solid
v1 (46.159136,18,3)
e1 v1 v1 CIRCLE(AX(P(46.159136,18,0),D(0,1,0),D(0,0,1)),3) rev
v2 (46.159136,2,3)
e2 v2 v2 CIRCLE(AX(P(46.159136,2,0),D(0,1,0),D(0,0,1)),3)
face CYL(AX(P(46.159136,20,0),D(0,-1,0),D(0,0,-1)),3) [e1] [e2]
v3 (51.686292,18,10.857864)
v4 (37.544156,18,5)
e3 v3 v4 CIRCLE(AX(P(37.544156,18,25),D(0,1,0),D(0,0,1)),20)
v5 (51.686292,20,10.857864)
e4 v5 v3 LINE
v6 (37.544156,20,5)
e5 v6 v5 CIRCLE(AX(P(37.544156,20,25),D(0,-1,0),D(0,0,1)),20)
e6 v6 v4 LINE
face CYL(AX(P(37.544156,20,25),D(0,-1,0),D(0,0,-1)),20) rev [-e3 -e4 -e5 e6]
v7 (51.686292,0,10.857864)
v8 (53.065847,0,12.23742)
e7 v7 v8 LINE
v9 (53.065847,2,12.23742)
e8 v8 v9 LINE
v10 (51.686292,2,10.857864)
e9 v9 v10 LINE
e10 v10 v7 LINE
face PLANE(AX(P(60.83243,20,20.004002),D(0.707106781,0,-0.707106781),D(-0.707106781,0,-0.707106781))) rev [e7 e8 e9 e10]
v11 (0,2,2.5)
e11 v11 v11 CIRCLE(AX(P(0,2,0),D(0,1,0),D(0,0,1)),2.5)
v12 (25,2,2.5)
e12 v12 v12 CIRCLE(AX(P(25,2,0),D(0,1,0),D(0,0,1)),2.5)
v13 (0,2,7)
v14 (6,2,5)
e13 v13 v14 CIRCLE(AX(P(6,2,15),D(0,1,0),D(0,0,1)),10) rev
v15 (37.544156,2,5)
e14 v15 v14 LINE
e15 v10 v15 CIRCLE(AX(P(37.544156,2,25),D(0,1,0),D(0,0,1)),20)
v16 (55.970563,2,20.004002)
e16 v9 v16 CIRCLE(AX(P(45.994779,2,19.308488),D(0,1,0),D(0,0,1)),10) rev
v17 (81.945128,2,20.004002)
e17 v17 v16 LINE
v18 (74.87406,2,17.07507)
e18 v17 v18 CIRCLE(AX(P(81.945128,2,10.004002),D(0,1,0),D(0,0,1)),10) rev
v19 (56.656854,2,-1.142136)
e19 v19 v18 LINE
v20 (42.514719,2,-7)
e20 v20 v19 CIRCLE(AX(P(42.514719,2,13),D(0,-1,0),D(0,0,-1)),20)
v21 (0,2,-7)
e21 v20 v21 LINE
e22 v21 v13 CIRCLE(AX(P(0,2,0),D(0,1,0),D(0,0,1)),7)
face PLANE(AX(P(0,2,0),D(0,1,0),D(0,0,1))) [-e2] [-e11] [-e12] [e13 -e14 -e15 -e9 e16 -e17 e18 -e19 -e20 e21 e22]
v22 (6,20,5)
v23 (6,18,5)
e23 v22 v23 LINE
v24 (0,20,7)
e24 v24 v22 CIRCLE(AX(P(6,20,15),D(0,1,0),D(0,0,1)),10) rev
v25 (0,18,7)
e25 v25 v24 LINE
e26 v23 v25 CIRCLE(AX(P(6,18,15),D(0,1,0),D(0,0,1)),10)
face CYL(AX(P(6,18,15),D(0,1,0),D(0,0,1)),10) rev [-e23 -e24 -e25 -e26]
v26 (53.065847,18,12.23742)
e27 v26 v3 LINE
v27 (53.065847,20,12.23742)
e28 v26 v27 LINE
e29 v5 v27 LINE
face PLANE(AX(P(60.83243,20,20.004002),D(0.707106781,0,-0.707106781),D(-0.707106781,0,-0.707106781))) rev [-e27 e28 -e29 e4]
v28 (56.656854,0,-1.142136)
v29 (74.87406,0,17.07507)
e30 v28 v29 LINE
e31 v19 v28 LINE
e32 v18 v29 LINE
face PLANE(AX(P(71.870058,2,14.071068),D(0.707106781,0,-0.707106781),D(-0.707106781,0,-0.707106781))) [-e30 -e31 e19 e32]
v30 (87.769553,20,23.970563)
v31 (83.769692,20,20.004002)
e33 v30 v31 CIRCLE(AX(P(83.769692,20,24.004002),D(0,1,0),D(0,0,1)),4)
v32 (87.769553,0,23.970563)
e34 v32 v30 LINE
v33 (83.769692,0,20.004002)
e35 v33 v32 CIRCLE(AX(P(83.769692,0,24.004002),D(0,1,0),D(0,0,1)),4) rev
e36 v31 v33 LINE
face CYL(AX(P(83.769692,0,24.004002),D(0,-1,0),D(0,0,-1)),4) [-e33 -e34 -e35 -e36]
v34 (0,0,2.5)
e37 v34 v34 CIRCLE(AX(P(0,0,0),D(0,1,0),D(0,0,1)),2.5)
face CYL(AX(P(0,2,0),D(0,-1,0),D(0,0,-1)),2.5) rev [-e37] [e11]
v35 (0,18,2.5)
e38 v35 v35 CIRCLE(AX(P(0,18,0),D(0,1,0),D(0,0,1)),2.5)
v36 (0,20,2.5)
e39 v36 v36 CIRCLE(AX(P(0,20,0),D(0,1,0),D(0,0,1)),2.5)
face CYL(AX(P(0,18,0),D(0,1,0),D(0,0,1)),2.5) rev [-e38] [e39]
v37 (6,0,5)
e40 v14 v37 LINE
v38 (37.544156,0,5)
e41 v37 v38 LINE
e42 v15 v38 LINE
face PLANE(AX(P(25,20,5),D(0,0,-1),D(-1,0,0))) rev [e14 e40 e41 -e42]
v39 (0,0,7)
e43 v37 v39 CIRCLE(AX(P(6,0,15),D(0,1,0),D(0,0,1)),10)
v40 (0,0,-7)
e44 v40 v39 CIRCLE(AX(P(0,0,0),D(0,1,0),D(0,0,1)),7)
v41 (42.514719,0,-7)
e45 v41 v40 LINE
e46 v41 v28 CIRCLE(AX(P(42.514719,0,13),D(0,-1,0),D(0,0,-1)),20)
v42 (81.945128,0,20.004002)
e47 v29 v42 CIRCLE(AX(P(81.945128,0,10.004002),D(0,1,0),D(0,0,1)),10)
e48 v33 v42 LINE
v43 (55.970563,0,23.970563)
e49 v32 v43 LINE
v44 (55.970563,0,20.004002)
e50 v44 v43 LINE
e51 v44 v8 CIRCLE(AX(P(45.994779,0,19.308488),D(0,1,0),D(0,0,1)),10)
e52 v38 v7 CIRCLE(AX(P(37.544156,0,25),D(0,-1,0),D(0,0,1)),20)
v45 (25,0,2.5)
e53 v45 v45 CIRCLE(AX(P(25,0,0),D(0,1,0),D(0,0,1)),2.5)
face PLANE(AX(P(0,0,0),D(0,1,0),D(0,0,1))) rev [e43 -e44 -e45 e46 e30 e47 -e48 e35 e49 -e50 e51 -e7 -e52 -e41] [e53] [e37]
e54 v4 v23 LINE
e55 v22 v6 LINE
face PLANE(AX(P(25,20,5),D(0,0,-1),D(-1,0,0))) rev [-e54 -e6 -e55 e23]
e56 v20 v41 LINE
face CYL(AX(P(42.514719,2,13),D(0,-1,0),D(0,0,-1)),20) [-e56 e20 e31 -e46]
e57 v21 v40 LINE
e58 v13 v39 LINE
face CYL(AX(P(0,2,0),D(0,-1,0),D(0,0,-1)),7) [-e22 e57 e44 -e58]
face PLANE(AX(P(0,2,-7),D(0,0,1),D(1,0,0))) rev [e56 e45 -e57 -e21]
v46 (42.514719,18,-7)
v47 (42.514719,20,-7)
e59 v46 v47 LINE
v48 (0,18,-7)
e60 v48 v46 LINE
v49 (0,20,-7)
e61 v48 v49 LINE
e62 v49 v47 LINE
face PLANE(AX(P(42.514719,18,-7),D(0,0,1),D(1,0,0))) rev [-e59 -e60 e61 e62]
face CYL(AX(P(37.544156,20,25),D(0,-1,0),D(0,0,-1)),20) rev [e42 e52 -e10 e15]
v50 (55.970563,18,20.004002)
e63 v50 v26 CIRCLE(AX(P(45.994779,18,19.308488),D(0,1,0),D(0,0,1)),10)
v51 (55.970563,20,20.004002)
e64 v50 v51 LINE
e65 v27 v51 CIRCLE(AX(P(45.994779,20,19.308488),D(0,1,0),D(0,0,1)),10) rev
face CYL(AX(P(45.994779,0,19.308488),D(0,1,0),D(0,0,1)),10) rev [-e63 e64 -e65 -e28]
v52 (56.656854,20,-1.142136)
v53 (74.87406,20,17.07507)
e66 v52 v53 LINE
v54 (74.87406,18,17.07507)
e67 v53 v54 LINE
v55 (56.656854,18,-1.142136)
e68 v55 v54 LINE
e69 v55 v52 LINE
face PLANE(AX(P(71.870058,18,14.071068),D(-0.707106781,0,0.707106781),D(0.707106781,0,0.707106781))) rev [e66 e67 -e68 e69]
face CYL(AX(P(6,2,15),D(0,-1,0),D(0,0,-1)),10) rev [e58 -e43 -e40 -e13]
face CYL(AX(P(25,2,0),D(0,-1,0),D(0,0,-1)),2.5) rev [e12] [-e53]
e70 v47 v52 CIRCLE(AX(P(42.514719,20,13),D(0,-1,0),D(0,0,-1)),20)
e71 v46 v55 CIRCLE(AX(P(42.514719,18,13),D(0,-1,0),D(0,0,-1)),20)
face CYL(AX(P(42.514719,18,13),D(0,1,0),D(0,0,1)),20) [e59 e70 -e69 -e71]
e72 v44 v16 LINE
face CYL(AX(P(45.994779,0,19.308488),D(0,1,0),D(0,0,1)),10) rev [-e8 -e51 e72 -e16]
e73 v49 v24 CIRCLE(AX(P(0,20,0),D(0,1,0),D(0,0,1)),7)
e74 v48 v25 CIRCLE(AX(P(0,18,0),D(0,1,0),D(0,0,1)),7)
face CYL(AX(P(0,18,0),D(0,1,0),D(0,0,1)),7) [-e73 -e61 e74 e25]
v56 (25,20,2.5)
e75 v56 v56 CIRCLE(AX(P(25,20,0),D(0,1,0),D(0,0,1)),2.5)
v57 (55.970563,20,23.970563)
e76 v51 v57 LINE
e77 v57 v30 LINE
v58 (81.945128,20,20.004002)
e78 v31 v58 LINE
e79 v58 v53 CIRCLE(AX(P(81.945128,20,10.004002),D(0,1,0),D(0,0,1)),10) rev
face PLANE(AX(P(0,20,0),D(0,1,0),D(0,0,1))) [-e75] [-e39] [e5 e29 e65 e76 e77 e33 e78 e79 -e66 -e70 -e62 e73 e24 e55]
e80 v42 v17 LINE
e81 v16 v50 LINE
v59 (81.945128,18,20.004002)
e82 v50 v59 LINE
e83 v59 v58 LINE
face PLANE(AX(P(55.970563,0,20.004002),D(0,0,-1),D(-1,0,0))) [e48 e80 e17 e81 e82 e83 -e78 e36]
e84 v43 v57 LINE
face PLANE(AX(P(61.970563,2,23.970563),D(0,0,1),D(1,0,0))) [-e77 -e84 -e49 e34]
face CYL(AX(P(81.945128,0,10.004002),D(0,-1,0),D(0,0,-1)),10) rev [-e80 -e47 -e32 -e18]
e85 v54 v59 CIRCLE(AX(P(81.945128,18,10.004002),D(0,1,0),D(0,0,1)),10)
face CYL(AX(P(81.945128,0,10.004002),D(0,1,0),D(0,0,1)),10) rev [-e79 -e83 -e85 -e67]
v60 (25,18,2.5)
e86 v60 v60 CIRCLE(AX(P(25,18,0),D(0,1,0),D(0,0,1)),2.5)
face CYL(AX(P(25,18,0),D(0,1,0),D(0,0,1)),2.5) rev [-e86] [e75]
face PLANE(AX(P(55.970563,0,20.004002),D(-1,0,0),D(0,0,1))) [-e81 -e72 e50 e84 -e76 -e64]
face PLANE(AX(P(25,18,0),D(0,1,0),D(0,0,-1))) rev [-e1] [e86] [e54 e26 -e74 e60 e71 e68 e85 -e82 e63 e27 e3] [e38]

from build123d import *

# Parameters (mm, degrees)
SKETCH1_R                = 2.5
BOSS_EXTRUDE1_DEPTH      = 2
BOSS_EXTRUDE2_DEPTH      = 2
BOSS_EXTRUDE3_DEPTH      = 18
BOSS_EXTRUDE3_DEPTH_BACK = 2
SKETCH4_W                = 31.798989874
SKETCH4_H                = 3.966560298
BOSS_EXTRUDE5_START      = -2
SKETCH6_R                = 2.5
BOSS_EXTRUDE5_DEPTH      = 2
FILLET1_R                = 10
FILLET2_R                = 10
FILLET4_R                = 4
CUT_EXTRUDE1_DEPTH       = 94.156093248
SKETCH9_W                = 6.238119779
SKETCH9_H                = 1.91760407
CUT_EXTRUDE2_DEPTH       = 94.156093248
FILLET5_R                = 10
FILLET6_R                = 10
BOSS_EXTRUDE6_REACH      = 94.747
SKETCH10_R               = 3


with BuildPart() as part:
    # Sketch1 → Boss-Extrude1 (new body)
    with BuildSketch(Plane(origin=(0, 0, 0), x_dir=(1, 0, 0), z_dir=(0, 1, 0))):
        with BuildLine():
            Line((0, 7), (25, 7))
            ThreePointArc((25, 7), (32, 0), (25, -7))
            Line((25, -7), (0, -7))
            ThreePointArc((0, -7), (-7, 0), (0, 7))
        make_face()
        with Locations(Location((0, 0, 0), (0, 0, 270))):
            Circle(SKETCH1_R, mode=Mode.SUBTRACT)
        with Locations(Location((25, 0, 0), (0, 0, 270))):
            Circle(SKETCH1_R, mode=Mode.SUBTRACT)
    extrude(amount=BOSS_EXTRUDE1_DEPTH)

    # Sketch3 → Boss-Extrude2 (add)
    with BuildSketch(Plane(origin=(0, 0, 0), x_dir=(-1, 0, 0), z_dir=(0, -1, 0))):
        with BuildLine():
            Line((-25, -7), (-36.715728753, -7))
            ThreePointArc((-36.715728753, -7), (-44.3693974, -8.52240935), (-50.857864376, -12.857864376))
            Line((-50.857864376, -12.857864376), (-61.970562748, -23.970562748))
            Line((-61.970562748, -23.970562748), (-81.769552622, -23.970562748))
            Line((-81.769552622, -23.970562748), (-71.870057685, -14.071067812))
            Line((-71.870057685, -14.071067812), (-56.656854249, 1.142135624))
            ThreePointArc((-56.656854249, 1.142135624), (-50.168387273, 5.47759065), (-42.514718626, 7))
            Line((-42.514718626, 7), (-25, 7))
            ThreePointArc((-25, 7), (-32, 0), (-25, -7))
        make_face()
    boss_extrude2 = extrude(amount=-BOSS_EXTRUDE2_DEPTH)

    # Sketch4 → Boss-Extrude3 (add, two sides: drawn at the far end of the back side and taken through both)
    with BuildSketch(Plane(origin=(0, 2, 0), x_dir=(1, 0, 0), z_dir=(0, 1, 0)).offset(-BOSS_EXTRUDE3_DEPTH_BACK)):
        with Locations((71.870057685, -21.987282599)):
            Rectangle(SKETCH4_W, SKETCH4_H)
    extrude(amount=BOSS_EXTRUDE3_DEPTH + BOSS_EXTRUDE3_DEPTH_BACK)

    # Mirror1: Boss-Extrude2 across plane
    add(boss_extrude2.mirror(Plane.ZX.offset(10)))

    # Sketch6 → Boss-Extrude5 (add)
    with BuildSketch(Plane(origin=(0, 20, 0), x_dir=(1, 0, 0), z_dir=(0, 1, 0)).offset(BOSS_EXTRUDE5_START)):
        with BuildLine():
            Line((25, -7), (0, -7))
            ThreePointArc((0, -7), (-7, 0), (0, 7))
            Line((0, 7), (25, 7))
            ThreePointArc((25, 7), (32, 0), (25, -7))
        make_face()
        with Locations(Location((0, 0, 0), (0, 0, 270))):
            Circle(SKETCH6_R, mode=Mode.SUBTRACT)
        with Locations(Location((25, 0, 0), (0, 0, 270))):
            Circle(SKETCH6_R, mode=Mode.SUBTRACT)
    extrude(amount=BOSS_EXTRUDE5_DEPTH)

    # Fillet1
    # the kernel refuses this fillet: 10 mm, written as the material it adds along each edge
    with BuildSketch(Plane(origin=(58.00400245, 0, 20.00400245), x_dir=(-1, 0, 0), z_dir=(0, 1, 0)), Plane(origin=(58.00400245, 18, 20.00400245), x_dir=(-1, 0, 0), z_dir=(0, 1, 0))) as fillet1_piece_1:
        with BuildLine():
            CenterArc((11.740850866, 2.401284758), FILLET1_R, 193.894123227, 31.105876773)
            Line((4.669783054, -4.669783054), (0, 0))
            Line((0, 0), (2.033439702, 0))
        make_face()
    extrude(amount=2)
    with BuildSketch(Plane(origin=(58.00400245, -16.510176322, 20.00400245), x_dir=(-1, 0, 0), z_dir=(0, 1, 0))) as fillet1_piece_2_section:
        with BuildLine():
            CenterArc((11.740850866, 2.401284758), FILLET1_R, 193.894123227, 31.105876773)
            Line((4.669783054, -4.669783054), (0, 0))
            Line((0, 0), (2.033439702, 0))
        make_face()
    fillet1_piece_2 = extrude(amount=35.020352644, mode=Mode.PRIVATE)
    fillet1_piece_2 = split(fillet1_piece_2, bisect_by=Plane(origin=(54.988670777, 18, 17.479262968), z_dir=(0, 1, 0)), keep=Keep.TOP, mode=Mode.PRIVATE)
    add(fillet1_piece_2)
    with BuildSketch(Plane(origin=(58.00400245, 1.489823678, 20.00400245), x_dir=(-1, 0, 0), z_dir=(0, 1, 0))) as fillet1_piece_3_section:
        with BuildLine():
            CenterArc((11.740850866, 2.401284758), FILLET1_R, 193.894123227, 31.105876773)
            Line((4.669783054, -4.669783054), (0, 0))
            Line((0, 0), (2.033439702, 0))
        make_face()
    fillet1_piece_3 = extrude(amount=35.020352644, mode=Mode.PRIVATE)
    fillet1_piece_3 = split(fillet1_piece_3, bisect_by=Plane(origin=(54.988670777, 2, 17.479262968), z_dir=(0, -1, 0)), keep=Keep.TOP, mode=Mode.PRIVATE)
    add(fillet1_piece_3)

    # Fillet2
    fillet2_edges = [part.edges().sort_by_distance(p)[0] for p in [
        (77.802992324, 1, 20.00400245),
        (77.802992324, 19, 20.00400245),
    ]]
    fillet(fillet2_edges, radius=FILLET2_R)

    # Fillet4
    # the kernel refuses this fillet: 4 mm, written as the material it takes off along each edge
    with BuildSketch(Plane(origin=(87.769552622, 30, 20.00400245), x_dir=(0, 0, 1), z_dir=(0, -1, 0))) as fillet4_piece_1:
        with BuildLine():
            CenterArc((FILLET4_R, FILLET4_R), FILLET4_R, 180, 90)
            Line((0, FILLET4_R), (0, 0))
            Line((0, 0), (FILLET4_R, 0))
        make_face()
    extrude(amount=40, mode=Mode.SUBTRACT)

    # Sketch8 → Cut-Extrude1 (cut, through all)
    with BuildSketch(Plane.XZ):
        with BuildLine():
            Line((0, 5), (25, 5))
            Line((25, 5), (37.544155877, 5))
            ThreePointArc((37.544155877, 5), (45.197824525, 6.52240935), (51.686291501, 10.857864376))
            Line((51.686291501, 10.857864376), (60.832429575, 20.00400245))
            Line((60.832429575, 20.00400245), (58.00400245, 20.00400245))
            Line((58.00400245, 20.00400245), (50.528510621, 12.697308088))
            ThreePointArc((50.528510621, 12.697308088), (44.096826604, 8.479014089), (36.548775141, 7))
            Line((36.548775141, 7), (0, 7))
            Line((0, 7), (0, 5))
        make_face()
    extrude(amount=-CUT_EXTRUDE1_DEPTH, mode=Mode.SUBTRACT)

    # Sketch9 → Cut-Extrude2 (cut, through all)
    with BuildSketch(Plane.XZ):
        with Locations((54.884942561, 19.045200415)):
            Rectangle(SKETCH9_W, SKETCH9_H)
    extrude(amount=-CUT_EXTRUDE2_DEPTH, mode=Mode.SUBTRACT)


with BuildPart() as body_2:
    # of the pieces the cut leaves, the one that is kept (cut_extrude2_keep)
    add(part.part.solids().sort_by_distance((74.874060135, 2, 17.075070262))[0])

    # Fillet5
    # the kernel refuses this fillet: 10 mm, written as the material it adds along each edge
    with BuildSketch(Plane(origin=(60.832429575, -9.459016288, 20.00400245), x_dir=(-0.7071067811865474, 0, -0.7071067811865478), z_dir=(0, 1, 0))) as fillet5_piece_1_section:
        with BuildLine():
            CenterArc((10.983606515, 10), FILLET5_R, 221.011773661, 48.988226339)
            Line((3.437859002, 3.437859002), (3.286944052, 3.306616182))
            ThreePointArc((3.286944052, 3.306616182), (1.577508145, 1.860350857), (-0.141421356, 0.141421356))
            Line((-0.141421356, 0.141421356), (0, -0.2))
            Line((0, -0.2), (10.983606515, -0.2))
            Line((10.983606515, -0.2), (10.983606515, 0))
        make_face()
    fillet5_piece_1 = extrude(amount=29.459016288, mode=Mode.PRIVATE)
    fillet5_piece_1 = split(fillet5_piece_1, bisect_by=Plane(origin=(55.139630426, 2, 14.853505851), z_dir=(0, -1, 0)), keep=Keep.TOP, mode=Mode.PRIVATE)
    fillet5_piece_1 = split(fillet5_piece_1, bisect_by=Plane(origin=(55.139630426, 0, 14.853505851), z_dir=(0, 1, 0)), keep=Keep.TOP, mode=Mode.PRIVATE)
    fillet5_piece_1 = split(fillet5_piece_1, bisect_by=Plane(origin=(55.970562748, 1, 14.853505851), z_dir=(-1, 0, 0)), keep=Keep.TOP, mode=Mode.PRIVATE)
    add(fillet5_piece_1)
    with BuildSketch(Plane(origin=(60.832429575, -9.459016288, 20.00400245), x_dir=(-0.7071067811865474, 0, -0.7071067811865478), z_dir=(0, 1, 0))) as fillet5_piece_2_section:
        with BuildLine():
            CenterArc((10.983606515, 10), FILLET5_R, 221.011773661, 48.988226339)
            Line((3.437859002, 3.437859002), (3.286944052, 3.306616182))
            ThreePointArc((3.286944052, 3.306616182), (1.577508145, 1.860350857), (-0.141421356, 0.141421356))
            Line((-0.141421356, 0.141421356), (0, -0.2))
            Line((0, -0.2), (10.983606515, -0.2))
            Line((10.983606515, -0.2), (10.983606515, 0))
        make_face()
    fillet5_piece_2 = extrude(amount=29.459016288, mode=Mode.PRIVATE)
    fillet5_piece_2 = split(fillet5_piece_2, bisect_by=Plane(origin=(57.757244396, 2, 18.390577646), z_dir=(0, -1, 0)), keep=Keep.TOP, mode=Mode.PRIVATE)
    fillet5_piece_2 = split(fillet5_piece_2, bisect_by=Plane(origin=(57.757244396, 0, 18.390577646), z_dir=(0, 1, 0)), keep=Keep.TOP, mode=Mode.PRIVATE)
    fillet5_piece_2 = split(fillet5_piece_2, bisect_by=Plane(origin=(55.970562748, 1, 18.390577646), z_dir=(1, 0, 0)), keep=Keep.TOP, mode=Mode.PRIVATE)
    add(fillet5_piece_2)
    with BuildSketch(Plane(origin=(60.832429575, 18, 20.00400245), x_dir=(-0.7071067811865472, 0, -0.7071067811865479), z_dir=(0, 1, 0))) as fillet5_piece_3_section:
        with BuildLine():
            CenterArc((10.983606515, 10), FILLET5_R, 221.011773661, 48.988226339)
            Line((3.437859002, 3.437859002), (3.286944052, 3.306616182))
            ThreePointArc((3.286944052, 3.306616182), (1.577508145, 1.860350857), (-0.141421356, 0.141421356))
            Line((-0.141421356, 0.141421356), (0, -0.2))
            Line((0, -0.2), (10.983606515, -0.2))
            Line((10.983606515, -0.2), (10.983606515, 0))
        make_face()
    fillet5_piece_3 = extrude(amount=2, mode=Mode.PRIVATE)
    fillet5_piece_3 = split(fillet5_piece_3, bisect_by=Plane(origin=(55.970562748, 19, 14.853505851), z_dir=(-1, 0, 0)), keep=Keep.TOP, mode=Mode.PRIVATE)
    add(fillet5_piece_3)
    with BuildSketch(Plane(origin=(60.832429575, 18, 20.00400245), x_dir=(-0.7071067811865472, 0, -0.7071067811865479), z_dir=(0, 1, 0))) as fillet5_piece_4_section:
        with BuildLine():
            CenterArc((10.983606515, 10), FILLET5_R, 221.011773661, 48.988226339)
            Line((3.437859002, 3.437859002), (3.286944052, 3.306616182))
            ThreePointArc((3.286944052, 3.306616182), (1.577508145, 1.860350857), (-0.141421356, 0.141421356))
            Line((-0.141421356, 0.141421356), (0, -0.2))
            Line((0, -0.2), (10.983606515, -0.2))
            Line((10.983606515, -0.2), (10.983606515, 0))
        make_face()
    fillet5_piece_4 = extrude(amount=2, mode=Mode.PRIVATE)
    fillet5_piece_4 = split(fillet5_piece_4, bisect_by=Plane(origin=(55.970562748, 19, 18.390577646), z_dir=(1, 0, 0)), keep=Keep.TOP, mode=Mode.PRIVATE)
    add(fillet5_piece_4)
    with BuildSketch(Plane(origin=(60.832429575, 0, 20.00400245), x_dir=(-1, 0, 0), z_dir=(0, 1, 0))) as fillet5_piece_5_section:
        with BuildLine():
            CenterArc((14.837650461, -0.695514837), FILLET5_R, 176.011773661, 48.988226339)
            Line((7.766582649, -7.766582649), (7.625161292, -7.908004005))
            Line((7.625161292, -7.908004005), (-0.141421356, -0.141421356))
            Line((-0.141421356, -0.141421356), (0, 0.2))
            ThreePointArc((0, 0.2), (2.430933413, 0.2), (4.662351154, 0.013910297))
            Line((4.662351154, 0.013910297), (4.861866827, 0))
        make_face()
    fillet5_piece_5 = extrude(amount=2, mode=Mode.PRIVATE)
    fillet5_piece_5 = split(fillet5_piece_5, bisect_by=Plane(origin=(55.970562748, 1, 18.390577646), z_dir=(1, 0, 0)), keep=Keep.TOP, mode=Mode.PRIVATE)
    add(fillet5_piece_5)
    with BuildSketch(Plane(origin=(60.832429575, 0, 20.00400245), x_dir=(-1, 0, 0), z_dir=(0, 1, 0))) as fillet5_piece_6_section:
        with BuildLine():
            CenterArc((14.837650461, -0.695514837), FILLET5_R, 176.011773661, 48.988226339)
            Line((7.766582649, -7.766582649), (7.625161292, -7.908004005))
            Line((7.625161292, -7.908004005), (-0.141421356, -0.141421356))
            Line((-0.141421356, -0.141421356), (0, 0.2))
            ThreePointArc((0, 0.2), (2.430933413, 0.2), (4.662351154, 0.013910297))
            Line((4.662351154, 0.013910297), (4.861866827, 0))
        make_face()
    fillet5_piece_6 = extrude(amount=2, mode=Mode.PRIVATE)
    fillet5_piece_6 = split(fillet5_piece_6, bisect_by=Plane(origin=(55.970562748, 1, 14.853505851), z_dir=(-1, 0, 0)), keep=Keep.TOP, mode=Mode.PRIVATE)
    add(fillet5_piece_6)
    with BuildSketch(Plane(origin=(60.832429575, 0, 20.00400245), x_dir=(-1, 0, 0), z_dir=(0, 1, 0))) as fillet5_piece_7_section:
        with BuildLine():
            CenterArc((14.837650461, -0.695514837), FILLET5_R, 176.011773661, 48.988226339)
            Line((7.766582649, -7.766582649), (7.625161292, -7.908004005))
            Line((7.625161292, -7.908004005), (-0.141421356, -0.141421356))
            Line((-0.141421356, -0.141421356), (0, 0.2))
            ThreePointArc((0, 0.2), (2.430933413, 0.2), (4.662351154, 0.013910297))
            Line((4.662351154, 0.013910297), (4.861866827, 0))
        make_face()
    fillet5_piece_7 = extrude(amount=29.459016288, mode=Mode.PRIVATE)
    fillet5_piece_7 = split(fillet5_piece_7, bisect_by=Plane(origin=(55.970562748, 19, 18.390577646), z_dir=(1, 0, 0)), keep=Keep.TOP, mode=Mode.PRIVATE)
    fillet5_piece_7 = split(fillet5_piece_7, bisect_by=Plane(origin=(57.757244396, 20, 18.390577646), z_dir=(0, -1, 0)), keep=Keep.TOP, mode=Mode.PRIVATE)
    fillet5_piece_7 = split(fillet5_piece_7, bisect_by=Plane(origin=(57.757244396, 18, 18.390577646), z_dir=(0, 1, 0)), keep=Keep.TOP, mode=Mode.PRIVATE)
    add(fillet5_piece_7)
    with BuildSketch(Plane(origin=(60.832429575, 0, 20.00400245), x_dir=(-1, 0, 0), z_dir=(0, 1, 0))) as fillet5_piece_8_section:
        with BuildLine():
            CenterArc((14.837650461, -0.695514837), FILLET5_R, 176.011773661, 48.988226339)
            Line((7.766582649, -7.766582649), (7.625161292, -7.908004005))
            Line((7.625161292, -7.908004005), (-0.141421356, -0.141421356))
            Line((-0.141421356, -0.141421356), (0, 0.2))
            ThreePointArc((0, 0.2), (2.430933413, 0.2), (4.662351154, 0.013910297))
            Line((4.662351154, 0.013910297), (4.861866827, 0))
        make_face()
    fillet5_piece_8 = extrude(amount=29.459016288, mode=Mode.PRIVATE)
    fillet5_piece_8 = split(fillet5_piece_8, bisect_by=Plane(origin=(55.970562748, 19, 14.853505851), z_dir=(-1, 0, 0)), keep=Keep.TOP, mode=Mode.PRIVATE)
    fillet5_piece_8 = split(fillet5_piece_8, bisect_by=Plane(origin=(55.139630426, 20, 14.853505851), z_dir=(0, -1, 0)), keep=Keep.TOP, mode=Mode.PRIVATE)
    fillet5_piece_8 = split(fillet5_piece_8, bisect_by=Plane(origin=(55.139630426, 18, 14.853505851), z_dir=(0, 1, 0)), keep=Keep.TOP, mode=Mode.PRIVATE)
    add(fillet5_piece_8)

    # Fillet6
    # the kernel refuses this fillet: 10 mm, written as the material it adds along each edge
    with BuildSketch(Plane(origin=(0, 18, 5), x_dir=(1, 0, 0), z_dir=(0, 1, 0))) as fillet6_piece_1:
        with BuildLine():
            CenterArc((6, -10), FILLET6_R, 90, 36.869897646)
            Line((0, -2), (-0.12, -1.84))
            ThreePointArc((-0.12, -1.84), (-0.2, -1), (-0.2, 0))
            Line((-0.2, 0), (0, 0.2))
            Line((0, 0.2), (6, 0.2))
            Line((6, 0.2), (6, 0))
        make_face()
    extrude(amount=2)
    with BuildSketch(Plane(origin=(0, 0, 5), x_dir=(0, 0, 1), z_dir=(0, 1, 0))) as fillet6_piece_2:
        with BuildLine():
            CenterArc((10, 6), FILLET6_R, 180, 36.869897646)
            Line((0, 6), (-0.2, 6))
            Line((-0.2, 6), (-0.2, 0))
            Line((-0.2, 0), (0, -0.2))
            ThreePointArc((0, -0.2), (1, -0.2), (1.84, -0.12))
            Line((1.84, -0.12), (2, 0))
        make_face()
    extrude(amount=2)

    # Sketch10 → Boss-Extrude6 (add, up to next)
    with BuildSketch(Plane(origin=(0, 2, 0), x_dir=(1, 0, 0), z_dir=(0, 1, 0)), mode=Mode.PRIVATE) as boss_extrude6_sk1:
        with Locations(Location((46.159136263, 0, 0), (0, 0, 270))):
            Circle(SKETCH10_R)
    boss_extrude6_tool1 = extrude(boss_extrude6_sk1.sketch, amount=BOSS_EXTRUDE6_REACH, mode=Mode.PRIVATE) - body_2.part
    add(boss_extrude6_tool1.solids().sort_by_distance((46.159136, 2, 0))[0])


solid = body_2.part
